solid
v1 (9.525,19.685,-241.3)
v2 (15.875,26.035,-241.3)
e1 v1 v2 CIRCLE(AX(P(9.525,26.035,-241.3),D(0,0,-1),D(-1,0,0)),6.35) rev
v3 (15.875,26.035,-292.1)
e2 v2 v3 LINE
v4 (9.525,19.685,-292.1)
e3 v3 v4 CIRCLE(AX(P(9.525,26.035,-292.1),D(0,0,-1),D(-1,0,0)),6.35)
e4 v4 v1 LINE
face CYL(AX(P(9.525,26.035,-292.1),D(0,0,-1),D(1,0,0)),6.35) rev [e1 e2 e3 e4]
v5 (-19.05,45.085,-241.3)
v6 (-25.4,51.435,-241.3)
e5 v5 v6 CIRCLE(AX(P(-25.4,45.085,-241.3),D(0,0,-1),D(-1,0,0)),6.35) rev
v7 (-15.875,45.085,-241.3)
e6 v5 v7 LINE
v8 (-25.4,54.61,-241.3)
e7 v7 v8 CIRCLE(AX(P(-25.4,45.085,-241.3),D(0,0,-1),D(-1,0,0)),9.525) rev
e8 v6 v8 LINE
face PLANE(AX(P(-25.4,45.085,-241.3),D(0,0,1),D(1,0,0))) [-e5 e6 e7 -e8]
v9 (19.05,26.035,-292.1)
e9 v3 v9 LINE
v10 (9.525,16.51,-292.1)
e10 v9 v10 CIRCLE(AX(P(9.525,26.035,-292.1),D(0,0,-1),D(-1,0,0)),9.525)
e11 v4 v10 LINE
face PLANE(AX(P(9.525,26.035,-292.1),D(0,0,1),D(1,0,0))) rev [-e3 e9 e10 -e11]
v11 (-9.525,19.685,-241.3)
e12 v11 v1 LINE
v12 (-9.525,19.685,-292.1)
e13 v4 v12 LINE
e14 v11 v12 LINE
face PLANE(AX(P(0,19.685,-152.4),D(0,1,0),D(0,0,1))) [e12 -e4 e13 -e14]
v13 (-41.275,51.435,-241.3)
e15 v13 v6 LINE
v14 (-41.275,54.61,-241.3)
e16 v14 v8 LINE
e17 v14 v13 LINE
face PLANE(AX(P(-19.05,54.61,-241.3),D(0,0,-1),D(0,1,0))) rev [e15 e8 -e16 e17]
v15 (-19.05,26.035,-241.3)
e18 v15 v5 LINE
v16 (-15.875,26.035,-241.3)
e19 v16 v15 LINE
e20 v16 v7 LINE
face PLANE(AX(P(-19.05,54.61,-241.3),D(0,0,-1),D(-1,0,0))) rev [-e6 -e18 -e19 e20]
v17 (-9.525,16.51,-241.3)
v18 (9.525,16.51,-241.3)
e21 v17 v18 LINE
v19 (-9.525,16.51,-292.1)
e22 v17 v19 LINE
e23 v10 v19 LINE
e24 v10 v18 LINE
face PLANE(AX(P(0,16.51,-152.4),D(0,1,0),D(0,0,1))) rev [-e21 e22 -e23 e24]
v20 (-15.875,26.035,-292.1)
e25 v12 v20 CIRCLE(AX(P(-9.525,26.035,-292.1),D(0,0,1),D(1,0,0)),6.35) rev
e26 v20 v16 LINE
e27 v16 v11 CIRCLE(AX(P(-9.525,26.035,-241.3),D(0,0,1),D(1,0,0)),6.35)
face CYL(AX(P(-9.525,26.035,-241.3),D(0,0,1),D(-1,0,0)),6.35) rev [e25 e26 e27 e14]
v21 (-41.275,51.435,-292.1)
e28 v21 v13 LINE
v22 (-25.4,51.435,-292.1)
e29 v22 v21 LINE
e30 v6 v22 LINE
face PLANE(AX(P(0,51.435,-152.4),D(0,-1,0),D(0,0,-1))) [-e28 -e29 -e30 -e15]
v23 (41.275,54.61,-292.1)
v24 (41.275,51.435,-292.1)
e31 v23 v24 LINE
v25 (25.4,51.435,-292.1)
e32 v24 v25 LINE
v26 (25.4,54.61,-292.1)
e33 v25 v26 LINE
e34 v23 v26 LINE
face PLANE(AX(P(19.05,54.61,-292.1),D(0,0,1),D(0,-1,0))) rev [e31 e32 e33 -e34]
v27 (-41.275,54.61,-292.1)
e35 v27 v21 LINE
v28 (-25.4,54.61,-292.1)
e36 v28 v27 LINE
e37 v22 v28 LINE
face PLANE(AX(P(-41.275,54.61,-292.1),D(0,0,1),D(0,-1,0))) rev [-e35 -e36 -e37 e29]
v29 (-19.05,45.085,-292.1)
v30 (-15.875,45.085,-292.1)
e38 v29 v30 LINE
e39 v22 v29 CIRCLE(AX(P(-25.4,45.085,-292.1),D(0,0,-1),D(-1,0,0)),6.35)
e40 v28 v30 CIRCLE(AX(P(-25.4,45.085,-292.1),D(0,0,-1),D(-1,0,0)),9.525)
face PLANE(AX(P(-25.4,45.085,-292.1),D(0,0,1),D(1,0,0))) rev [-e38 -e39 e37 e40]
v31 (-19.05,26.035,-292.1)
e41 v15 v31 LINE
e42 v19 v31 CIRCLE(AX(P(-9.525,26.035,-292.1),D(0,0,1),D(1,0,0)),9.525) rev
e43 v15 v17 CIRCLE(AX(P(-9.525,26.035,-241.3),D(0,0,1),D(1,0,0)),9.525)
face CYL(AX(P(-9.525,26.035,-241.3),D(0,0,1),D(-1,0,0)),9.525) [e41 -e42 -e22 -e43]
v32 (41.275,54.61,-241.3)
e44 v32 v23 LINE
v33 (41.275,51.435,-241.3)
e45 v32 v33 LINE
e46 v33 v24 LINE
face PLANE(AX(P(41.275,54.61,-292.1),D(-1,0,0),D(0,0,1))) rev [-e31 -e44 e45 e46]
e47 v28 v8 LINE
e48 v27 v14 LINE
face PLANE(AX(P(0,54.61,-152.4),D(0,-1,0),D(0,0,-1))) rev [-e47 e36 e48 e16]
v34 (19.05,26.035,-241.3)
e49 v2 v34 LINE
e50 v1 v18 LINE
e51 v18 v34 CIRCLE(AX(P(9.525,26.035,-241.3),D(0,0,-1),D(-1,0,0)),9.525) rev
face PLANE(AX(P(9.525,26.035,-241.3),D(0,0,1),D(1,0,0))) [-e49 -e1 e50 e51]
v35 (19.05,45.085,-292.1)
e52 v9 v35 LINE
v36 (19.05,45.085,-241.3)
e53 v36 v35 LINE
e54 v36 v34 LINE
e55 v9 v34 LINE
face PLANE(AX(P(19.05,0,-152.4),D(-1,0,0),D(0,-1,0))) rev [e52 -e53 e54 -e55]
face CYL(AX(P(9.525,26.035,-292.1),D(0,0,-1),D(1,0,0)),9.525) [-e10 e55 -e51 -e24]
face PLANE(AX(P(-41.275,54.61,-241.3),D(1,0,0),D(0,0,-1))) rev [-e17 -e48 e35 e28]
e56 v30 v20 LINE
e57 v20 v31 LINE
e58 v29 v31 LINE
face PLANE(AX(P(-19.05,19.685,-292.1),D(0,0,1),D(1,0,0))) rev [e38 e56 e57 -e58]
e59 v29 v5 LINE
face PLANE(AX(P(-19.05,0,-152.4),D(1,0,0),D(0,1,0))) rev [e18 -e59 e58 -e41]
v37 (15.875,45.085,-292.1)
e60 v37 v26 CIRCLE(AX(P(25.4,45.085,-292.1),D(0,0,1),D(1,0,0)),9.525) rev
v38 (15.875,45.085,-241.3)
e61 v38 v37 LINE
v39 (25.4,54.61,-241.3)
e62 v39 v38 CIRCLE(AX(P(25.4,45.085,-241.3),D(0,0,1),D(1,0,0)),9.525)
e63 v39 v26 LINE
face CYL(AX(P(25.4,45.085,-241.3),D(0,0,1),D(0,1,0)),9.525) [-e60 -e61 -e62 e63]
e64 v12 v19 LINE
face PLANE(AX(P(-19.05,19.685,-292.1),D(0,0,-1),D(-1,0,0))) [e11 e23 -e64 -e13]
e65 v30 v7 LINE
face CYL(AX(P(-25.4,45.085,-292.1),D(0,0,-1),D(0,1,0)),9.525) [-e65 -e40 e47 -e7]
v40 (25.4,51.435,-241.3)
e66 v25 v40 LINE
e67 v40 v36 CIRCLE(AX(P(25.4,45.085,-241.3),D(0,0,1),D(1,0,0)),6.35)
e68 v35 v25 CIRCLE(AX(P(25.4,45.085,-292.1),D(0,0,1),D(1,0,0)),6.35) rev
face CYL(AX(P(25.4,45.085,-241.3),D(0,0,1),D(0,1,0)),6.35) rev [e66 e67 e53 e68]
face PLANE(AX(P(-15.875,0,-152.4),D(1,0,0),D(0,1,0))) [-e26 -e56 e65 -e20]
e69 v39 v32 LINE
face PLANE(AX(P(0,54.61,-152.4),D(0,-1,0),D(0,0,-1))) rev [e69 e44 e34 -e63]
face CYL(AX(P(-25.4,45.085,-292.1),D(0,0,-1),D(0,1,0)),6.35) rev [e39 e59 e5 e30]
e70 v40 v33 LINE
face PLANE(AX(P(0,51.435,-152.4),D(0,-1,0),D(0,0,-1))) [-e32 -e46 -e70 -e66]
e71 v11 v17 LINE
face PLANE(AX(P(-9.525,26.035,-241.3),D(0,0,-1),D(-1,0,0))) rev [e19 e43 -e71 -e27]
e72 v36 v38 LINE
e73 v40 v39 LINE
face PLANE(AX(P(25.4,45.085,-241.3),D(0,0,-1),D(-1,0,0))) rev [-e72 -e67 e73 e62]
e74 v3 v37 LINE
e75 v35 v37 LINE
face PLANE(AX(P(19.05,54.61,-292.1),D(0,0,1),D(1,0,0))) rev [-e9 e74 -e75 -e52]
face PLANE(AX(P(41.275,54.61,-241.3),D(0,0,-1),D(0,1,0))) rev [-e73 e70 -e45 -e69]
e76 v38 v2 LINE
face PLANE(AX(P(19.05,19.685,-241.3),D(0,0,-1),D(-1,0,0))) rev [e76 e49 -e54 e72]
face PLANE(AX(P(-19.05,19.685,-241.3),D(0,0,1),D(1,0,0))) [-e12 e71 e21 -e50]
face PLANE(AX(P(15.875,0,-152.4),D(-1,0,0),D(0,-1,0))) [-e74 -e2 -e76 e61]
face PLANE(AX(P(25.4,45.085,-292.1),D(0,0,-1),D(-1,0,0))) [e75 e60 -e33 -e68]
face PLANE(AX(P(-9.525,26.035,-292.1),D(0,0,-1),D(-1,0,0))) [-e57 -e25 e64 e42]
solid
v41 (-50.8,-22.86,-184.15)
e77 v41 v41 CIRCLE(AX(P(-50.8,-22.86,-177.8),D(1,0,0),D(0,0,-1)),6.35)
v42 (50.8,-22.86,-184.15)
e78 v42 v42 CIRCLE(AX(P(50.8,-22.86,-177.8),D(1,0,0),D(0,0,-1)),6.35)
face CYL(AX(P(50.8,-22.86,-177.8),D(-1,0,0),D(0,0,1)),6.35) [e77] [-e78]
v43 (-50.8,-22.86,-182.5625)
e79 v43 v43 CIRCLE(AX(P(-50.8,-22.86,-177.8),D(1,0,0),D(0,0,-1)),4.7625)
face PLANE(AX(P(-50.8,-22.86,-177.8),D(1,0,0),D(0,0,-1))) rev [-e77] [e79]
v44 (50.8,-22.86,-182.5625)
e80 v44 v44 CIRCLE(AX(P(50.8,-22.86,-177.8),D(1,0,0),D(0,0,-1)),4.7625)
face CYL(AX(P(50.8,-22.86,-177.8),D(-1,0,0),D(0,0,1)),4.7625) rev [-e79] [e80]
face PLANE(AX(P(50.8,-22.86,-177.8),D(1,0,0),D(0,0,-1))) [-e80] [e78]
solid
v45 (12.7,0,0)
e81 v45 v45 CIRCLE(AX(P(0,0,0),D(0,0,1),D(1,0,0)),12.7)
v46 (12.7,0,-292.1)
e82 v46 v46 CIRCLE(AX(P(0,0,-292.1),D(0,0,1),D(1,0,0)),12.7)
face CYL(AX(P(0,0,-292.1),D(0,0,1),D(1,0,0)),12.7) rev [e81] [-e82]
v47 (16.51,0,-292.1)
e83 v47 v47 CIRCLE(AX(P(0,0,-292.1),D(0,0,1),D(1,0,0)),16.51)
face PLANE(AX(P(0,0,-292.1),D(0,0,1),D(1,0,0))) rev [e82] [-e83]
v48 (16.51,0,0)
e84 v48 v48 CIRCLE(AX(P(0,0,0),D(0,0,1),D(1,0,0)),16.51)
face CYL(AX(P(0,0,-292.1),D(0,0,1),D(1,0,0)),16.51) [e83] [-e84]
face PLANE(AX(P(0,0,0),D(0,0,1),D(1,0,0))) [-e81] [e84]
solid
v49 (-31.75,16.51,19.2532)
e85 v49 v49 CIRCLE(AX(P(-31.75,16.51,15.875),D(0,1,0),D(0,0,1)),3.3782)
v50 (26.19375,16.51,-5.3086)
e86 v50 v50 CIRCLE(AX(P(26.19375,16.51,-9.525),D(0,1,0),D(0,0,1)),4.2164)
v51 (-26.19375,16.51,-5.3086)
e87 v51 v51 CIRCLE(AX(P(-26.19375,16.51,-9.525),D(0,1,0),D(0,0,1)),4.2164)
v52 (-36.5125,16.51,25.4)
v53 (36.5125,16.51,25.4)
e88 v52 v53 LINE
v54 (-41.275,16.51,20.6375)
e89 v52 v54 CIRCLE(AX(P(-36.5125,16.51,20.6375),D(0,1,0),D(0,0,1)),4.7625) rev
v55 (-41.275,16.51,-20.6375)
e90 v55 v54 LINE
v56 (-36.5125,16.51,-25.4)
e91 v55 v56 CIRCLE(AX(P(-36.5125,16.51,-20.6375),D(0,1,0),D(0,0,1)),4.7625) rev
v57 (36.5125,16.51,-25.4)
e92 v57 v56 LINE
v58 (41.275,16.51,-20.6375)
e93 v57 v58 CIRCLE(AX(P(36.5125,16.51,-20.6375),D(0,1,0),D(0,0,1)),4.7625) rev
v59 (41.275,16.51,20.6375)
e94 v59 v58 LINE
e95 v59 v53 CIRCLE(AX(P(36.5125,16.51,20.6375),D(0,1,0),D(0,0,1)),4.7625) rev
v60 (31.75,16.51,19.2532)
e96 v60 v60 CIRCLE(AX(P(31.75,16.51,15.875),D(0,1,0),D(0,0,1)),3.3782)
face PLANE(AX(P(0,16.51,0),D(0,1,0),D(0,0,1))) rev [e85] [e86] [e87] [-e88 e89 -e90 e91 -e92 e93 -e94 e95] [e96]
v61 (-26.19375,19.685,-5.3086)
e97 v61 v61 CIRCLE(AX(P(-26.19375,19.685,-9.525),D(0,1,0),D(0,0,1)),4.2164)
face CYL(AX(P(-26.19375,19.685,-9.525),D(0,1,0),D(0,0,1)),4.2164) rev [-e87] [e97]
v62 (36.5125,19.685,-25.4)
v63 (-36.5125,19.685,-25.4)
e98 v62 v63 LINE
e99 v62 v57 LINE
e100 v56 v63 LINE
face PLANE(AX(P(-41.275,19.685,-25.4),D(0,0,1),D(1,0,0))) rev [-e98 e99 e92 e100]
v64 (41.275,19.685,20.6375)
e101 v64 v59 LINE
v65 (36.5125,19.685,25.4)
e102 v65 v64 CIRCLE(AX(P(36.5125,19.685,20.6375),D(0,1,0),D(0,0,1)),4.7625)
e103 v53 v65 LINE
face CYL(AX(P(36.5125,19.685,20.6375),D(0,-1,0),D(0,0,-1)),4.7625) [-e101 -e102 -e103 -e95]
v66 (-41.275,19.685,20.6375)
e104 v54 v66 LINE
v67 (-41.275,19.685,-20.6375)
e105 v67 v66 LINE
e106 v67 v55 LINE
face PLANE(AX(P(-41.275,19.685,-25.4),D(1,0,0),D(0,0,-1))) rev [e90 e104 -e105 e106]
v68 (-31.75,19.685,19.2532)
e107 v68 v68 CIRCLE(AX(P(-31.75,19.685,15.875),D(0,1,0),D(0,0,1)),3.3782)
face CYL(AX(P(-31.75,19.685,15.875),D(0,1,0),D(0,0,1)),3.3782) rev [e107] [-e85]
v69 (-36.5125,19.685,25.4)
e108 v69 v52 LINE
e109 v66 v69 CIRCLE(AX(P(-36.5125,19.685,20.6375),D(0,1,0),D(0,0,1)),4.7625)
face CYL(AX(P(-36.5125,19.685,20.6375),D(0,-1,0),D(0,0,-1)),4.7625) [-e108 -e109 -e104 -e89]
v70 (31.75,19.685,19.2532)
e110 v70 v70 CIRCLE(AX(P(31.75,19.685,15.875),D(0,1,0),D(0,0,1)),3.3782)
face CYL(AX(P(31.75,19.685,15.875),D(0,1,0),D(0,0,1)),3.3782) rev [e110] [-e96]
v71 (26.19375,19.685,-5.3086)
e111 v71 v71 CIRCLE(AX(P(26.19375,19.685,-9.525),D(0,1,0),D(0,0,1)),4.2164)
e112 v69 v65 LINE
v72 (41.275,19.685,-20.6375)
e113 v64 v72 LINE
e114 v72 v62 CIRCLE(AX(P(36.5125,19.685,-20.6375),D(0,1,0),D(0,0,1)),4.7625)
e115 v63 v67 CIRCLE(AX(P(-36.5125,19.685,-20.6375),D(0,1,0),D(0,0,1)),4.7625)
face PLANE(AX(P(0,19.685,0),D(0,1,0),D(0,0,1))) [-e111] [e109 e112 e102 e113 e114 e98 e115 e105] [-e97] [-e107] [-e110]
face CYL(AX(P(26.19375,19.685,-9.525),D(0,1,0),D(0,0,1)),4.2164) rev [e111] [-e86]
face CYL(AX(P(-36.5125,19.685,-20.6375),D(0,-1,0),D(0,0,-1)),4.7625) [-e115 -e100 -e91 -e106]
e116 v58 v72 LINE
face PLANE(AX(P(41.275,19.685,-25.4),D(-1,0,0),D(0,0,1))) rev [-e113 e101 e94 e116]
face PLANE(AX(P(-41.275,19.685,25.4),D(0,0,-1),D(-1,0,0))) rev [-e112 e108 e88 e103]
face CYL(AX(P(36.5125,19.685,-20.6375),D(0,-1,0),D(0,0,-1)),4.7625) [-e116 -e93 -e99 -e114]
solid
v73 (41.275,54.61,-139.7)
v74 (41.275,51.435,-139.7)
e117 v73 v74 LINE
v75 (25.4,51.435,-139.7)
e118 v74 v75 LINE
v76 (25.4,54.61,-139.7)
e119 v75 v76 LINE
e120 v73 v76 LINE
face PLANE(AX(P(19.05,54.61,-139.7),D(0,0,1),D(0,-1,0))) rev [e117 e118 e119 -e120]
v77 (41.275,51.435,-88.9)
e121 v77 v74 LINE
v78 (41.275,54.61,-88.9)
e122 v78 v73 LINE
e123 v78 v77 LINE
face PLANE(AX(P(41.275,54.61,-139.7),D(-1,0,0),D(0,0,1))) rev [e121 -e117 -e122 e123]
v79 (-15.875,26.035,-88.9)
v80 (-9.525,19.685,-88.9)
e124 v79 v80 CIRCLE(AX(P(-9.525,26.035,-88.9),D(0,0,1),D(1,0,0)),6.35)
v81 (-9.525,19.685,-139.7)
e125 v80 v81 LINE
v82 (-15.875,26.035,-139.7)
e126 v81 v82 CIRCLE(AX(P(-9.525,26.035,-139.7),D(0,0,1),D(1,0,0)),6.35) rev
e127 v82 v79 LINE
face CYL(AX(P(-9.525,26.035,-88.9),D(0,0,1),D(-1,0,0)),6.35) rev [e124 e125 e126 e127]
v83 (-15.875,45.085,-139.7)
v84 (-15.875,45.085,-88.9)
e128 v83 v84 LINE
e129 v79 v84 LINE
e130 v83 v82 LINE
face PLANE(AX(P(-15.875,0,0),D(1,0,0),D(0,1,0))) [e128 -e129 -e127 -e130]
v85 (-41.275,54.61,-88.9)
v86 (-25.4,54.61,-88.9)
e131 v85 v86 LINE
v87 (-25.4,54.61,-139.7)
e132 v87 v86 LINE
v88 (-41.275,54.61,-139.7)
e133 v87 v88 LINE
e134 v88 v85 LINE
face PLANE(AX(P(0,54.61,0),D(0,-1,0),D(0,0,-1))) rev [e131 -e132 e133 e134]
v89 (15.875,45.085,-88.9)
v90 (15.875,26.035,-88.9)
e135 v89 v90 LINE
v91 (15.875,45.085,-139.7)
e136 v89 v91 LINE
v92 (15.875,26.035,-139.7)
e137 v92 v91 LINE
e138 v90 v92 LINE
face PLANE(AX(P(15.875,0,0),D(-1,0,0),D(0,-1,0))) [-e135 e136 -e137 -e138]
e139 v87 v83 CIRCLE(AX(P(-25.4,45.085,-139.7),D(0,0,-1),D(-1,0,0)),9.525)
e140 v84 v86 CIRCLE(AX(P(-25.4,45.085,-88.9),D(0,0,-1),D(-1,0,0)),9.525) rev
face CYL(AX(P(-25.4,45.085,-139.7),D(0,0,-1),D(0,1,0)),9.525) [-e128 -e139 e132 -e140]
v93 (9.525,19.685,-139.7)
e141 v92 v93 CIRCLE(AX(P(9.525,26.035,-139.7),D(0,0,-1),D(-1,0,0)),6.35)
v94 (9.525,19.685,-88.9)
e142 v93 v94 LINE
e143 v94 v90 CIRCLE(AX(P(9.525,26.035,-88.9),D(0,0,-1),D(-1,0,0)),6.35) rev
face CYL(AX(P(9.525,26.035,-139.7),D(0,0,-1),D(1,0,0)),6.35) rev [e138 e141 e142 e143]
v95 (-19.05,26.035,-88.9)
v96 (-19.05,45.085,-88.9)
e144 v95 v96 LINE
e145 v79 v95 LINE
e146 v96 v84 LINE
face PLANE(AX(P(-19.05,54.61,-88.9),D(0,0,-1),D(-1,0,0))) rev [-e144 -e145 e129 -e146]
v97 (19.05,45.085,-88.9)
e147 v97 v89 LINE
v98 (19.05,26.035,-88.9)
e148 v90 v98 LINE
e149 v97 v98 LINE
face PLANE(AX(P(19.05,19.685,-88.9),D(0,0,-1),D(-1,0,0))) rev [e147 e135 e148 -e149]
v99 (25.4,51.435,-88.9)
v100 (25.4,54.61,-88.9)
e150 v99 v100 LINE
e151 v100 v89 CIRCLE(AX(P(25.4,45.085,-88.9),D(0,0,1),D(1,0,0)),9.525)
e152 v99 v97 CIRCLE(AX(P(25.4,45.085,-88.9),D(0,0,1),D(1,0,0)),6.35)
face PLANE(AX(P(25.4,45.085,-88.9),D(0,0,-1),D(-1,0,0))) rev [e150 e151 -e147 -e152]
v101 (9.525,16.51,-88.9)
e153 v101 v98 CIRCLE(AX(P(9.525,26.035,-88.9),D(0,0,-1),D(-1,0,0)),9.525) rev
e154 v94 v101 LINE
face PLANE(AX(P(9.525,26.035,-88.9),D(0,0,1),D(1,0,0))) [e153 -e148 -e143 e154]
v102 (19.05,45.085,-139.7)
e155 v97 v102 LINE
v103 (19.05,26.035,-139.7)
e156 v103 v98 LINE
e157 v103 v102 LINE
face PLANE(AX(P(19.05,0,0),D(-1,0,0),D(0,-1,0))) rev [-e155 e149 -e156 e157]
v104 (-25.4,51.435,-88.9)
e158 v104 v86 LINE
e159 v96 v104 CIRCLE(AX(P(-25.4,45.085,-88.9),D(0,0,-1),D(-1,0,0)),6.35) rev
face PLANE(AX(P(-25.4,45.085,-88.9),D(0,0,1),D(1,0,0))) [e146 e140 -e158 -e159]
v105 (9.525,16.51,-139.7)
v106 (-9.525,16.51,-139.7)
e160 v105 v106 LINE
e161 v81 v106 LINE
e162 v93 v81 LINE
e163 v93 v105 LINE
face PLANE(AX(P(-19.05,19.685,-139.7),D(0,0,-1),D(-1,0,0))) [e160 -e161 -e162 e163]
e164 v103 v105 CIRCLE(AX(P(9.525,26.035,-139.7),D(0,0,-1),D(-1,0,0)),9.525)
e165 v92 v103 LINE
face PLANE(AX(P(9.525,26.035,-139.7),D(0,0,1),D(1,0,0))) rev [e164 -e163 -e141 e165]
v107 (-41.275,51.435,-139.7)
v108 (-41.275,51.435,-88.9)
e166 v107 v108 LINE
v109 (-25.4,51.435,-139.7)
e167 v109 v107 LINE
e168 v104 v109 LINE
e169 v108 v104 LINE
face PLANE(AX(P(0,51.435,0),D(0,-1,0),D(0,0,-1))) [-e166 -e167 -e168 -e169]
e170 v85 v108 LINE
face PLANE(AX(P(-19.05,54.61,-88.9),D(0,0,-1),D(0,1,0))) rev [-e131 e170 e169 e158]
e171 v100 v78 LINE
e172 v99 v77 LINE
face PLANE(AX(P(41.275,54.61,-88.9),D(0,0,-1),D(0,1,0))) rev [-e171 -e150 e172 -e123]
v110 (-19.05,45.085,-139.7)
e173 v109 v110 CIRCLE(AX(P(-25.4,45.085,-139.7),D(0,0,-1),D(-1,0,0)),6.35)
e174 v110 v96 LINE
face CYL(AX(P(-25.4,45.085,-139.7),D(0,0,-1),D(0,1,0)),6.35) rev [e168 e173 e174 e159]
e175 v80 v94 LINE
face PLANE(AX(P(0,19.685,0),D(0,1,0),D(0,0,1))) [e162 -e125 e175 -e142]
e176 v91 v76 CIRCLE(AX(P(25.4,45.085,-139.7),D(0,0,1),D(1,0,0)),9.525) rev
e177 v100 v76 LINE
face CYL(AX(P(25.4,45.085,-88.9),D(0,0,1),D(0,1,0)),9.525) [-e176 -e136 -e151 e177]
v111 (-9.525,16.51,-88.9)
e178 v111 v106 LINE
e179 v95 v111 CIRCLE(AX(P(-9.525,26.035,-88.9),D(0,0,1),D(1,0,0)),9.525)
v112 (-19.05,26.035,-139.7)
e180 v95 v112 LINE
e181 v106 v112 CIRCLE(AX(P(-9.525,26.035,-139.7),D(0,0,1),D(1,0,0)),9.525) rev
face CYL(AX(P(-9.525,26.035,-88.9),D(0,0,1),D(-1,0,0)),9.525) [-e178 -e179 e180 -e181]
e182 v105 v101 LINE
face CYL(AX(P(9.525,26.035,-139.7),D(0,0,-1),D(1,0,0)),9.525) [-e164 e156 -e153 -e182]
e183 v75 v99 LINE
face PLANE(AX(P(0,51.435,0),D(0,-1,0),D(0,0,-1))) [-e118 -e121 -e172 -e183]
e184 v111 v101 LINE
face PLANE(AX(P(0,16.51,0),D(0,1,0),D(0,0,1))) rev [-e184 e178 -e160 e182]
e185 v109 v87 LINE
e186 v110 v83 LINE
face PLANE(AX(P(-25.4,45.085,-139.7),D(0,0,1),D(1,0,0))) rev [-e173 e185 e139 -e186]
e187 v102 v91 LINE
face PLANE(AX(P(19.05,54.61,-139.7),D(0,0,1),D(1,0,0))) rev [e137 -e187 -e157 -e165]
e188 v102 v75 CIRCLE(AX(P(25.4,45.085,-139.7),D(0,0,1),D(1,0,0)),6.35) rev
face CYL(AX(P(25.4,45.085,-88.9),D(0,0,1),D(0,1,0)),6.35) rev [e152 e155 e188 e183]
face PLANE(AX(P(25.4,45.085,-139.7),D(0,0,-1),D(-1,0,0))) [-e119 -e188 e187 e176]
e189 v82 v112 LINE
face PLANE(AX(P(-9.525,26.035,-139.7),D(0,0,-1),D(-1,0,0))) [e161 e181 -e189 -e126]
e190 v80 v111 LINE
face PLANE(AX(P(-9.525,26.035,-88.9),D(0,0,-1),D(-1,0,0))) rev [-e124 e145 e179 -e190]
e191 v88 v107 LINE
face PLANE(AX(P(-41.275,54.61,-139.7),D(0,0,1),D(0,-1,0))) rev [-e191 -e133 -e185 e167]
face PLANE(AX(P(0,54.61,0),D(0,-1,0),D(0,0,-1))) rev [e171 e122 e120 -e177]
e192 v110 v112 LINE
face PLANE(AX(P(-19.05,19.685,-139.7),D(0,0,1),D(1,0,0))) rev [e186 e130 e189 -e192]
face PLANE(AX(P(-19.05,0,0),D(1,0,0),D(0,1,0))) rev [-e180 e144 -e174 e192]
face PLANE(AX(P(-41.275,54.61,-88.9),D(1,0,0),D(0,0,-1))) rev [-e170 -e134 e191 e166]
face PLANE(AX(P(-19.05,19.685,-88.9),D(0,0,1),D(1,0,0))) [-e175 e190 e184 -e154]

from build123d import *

# Parameters (mm, degrees)
SKETCH1_R                         = 16.51
SKETCH1_R_2                       = 12.7
BOSS_EXTRUDE1_DEPTH               = 292.1
BOSS_EXTRUDE2_START               = 16.51
SKETCH2_W                         = 82.55
SKETCH2_H                         = 50.8
BOSS_EXTRUDE2_DEPTH               = 3.175
SKETCH2_W_2                       = 38.1
BOSS_EXTRUDE2_2_DEPTH             = 3.175
FILLET1_R                         = 4.7625
SKETCH4_W                         = 3.3782
SKETCH4_H                         = 36.195
F_1_4_CLEARANCE_HOLE1_AT_2_COUNT  = 2
F_1_4_CLEARANCE_HOLE1_AT_2_PITCH  = 63.5
SKETCH18_W                        = 4.2164
SKETCH18_H                        = 36.195
F_5_16_CLEARANCE_HOLE1_AT_2_COUNT = 2
F_5_16_CLEARANCE_HOLE1_AT_2_PITCH = 52.3875
SKETCH16_R                        = 6.35
SKETCH16_R_2                      = 4.7625
BOSS_EXTRUDE3_DEPTH               = 50.8
EDGE_FLANGE1_STRIP_W              = 25.4
EDGE_FLANGE1_STRIP_H              = 3.175
EDGE_FLANGE1_STRIP_CUT_DEPTH      = 50.8
EDGE_FLANGE1_STRIP_2_W            = 25.4
EDGE_FLANGE1_STRIP_2_H            = 3.175
EDGE_FLANGE1_STRIP_CUT_2_DEPTH    = 50.8
EDGE_FLANGE1_DEPTH                = 50.8
EDGE_FLANGE1_BEND_DEPTH           = 50.8
EDGE_FLANGE3_STRIP_W              = 25.4
EDGE_FLANGE3_STRIP_H              = 3.175
EDGE_FLANGE3_STRIP_CUT_DEPTH      = 50.8
EDGE_FLANGE3_STRIP_2_W            = 25.4
EDGE_FLANGE3_STRIP_2_H            = 3.175
EDGE_FLANGE3_STRIP_CUT_2_DEPTH    = 50.8
EDGE_FLANGE3_DEPTH                = 50.8
EDGE_FLANGE3_BEND_DEPTH           = 50.8
LPATTERN1_COUNT                   = 2
LPATTERN1_PITCH                   = 152.4


# Sheet-metal steps are written as plain solids
with BuildPart() as part:
    # Sketch1 → Boss-Extrude1 (new body)
    with BuildSketch(Plane.XY):
        Circle(SKETCH1_R)
        Circle(SKETCH1_R_2, mode=Mode.SUBTRACT)
    extrude(amount=-BOSS_EXTRUDE1_DEPTH)


with BuildPart() as body_2:
    # Sketch2 → Boss-Extrude2 (new body)
    with BuildSketch(Plane(origin=(0, 0, 0), x_dir=(1, 0, 0), z_dir=(0, 1, 0)).offset(BOSS_EXTRUDE2_START)):
        Rectangle(SKETCH2_W, SKETCH2_H)
    extrude(amount=BOSS_EXTRUDE2_DEPTH)

    # Fillet1
    fillet1_edges = [body_2.edges().sort_by_distance(p)[0] for p in [
        (-41.275, 18.0975, -25.4),
        (41.275, 18.0975, -25.4),
        (41.275, 18.0975, 25.4),
        (-41.275, 18.0975, 25.4),
    ]]
    fillet(fillet1_edges, radius=FILLET1_R)

    # Sketch4 → 1/4 Clearance Hole1 (revolve, cut)
    with BuildSketch(Plane(origin=(-31.75, 19.685, 15.875), x_dir=(0, 0, 1), z_dir=(1, 0, 0))):
        with Locations((1.6891, 18.0975)):
            Rectangle(SKETCH4_W, SKETCH4_H)
    f_1_4_clearance_hole1 = revolve(axis=Axis((-31.75, 26.035, 15.875), (0, -1, 0)), mode=Mode.SUBTRACT)

    # 1/4 Clearance Hole1 at 2: 1/4 Clearance Hole1 ×2
    with Locations(*[(i * F_1_4_CLEARANCE_HOLE1_AT_2_PITCH, 0, 0) for i in range(1, F_1_4_CLEARANCE_HOLE1_AT_2_COUNT)]):
        add(f_1_4_clearance_hole1, mode=Mode.SUBTRACT)

    # Sketch18 → 5/16 Clearance Hole1 (revolve, cut)
    with BuildSketch(Plane(origin=(-26.19375, 19.685, -9.525), x_dir=(0, 0, 1), z_dir=(1, 0, 0))):
        with Locations((2.1082, 18.0975)):
            Rectangle(SKETCH18_W, SKETCH18_H)
    f_5_16_clearance_hole1 = revolve(axis=Axis((-26.19375, 26.035, -9.525), (0, -1, 0)), mode=Mode.SUBTRACT)

    # 5/16 Clearance Hole1 at 2: 5/16 Clearance Hole1 ×2
    with Locations(*[(i * F_5_16_CLEARANCE_HOLE1_AT_2_PITCH, 0, 0) for i in range(1, F_5_16_CLEARANCE_HOLE1_AT_2_COUNT)]):
        add(f_5_16_clearance_hole1, mode=Mode.SUBTRACT)


with BuildPart() as body_3:
    # Sketch2 → Boss-Extrude2 2 (new body)
    with BuildSketch(Plane(origin=(0, 0, 0), x_dir=(1, 0, 0), z_dir=(0, 1, 0)).offset(BOSS_EXTRUDE2_START)):
        with Locations((0, 114.3)):
            Rectangle(SKETCH2_W_2, SKETCH2_H)
    extrude(amount=BOSS_EXTRUDE2_2_DEPTH)

    # Edge-Flange1 strip (across the edge) → Edge-Flange1 strip cut (cut)
    with BuildSketch(Plane(origin=(19.05, 19.685, -88.9), x_dir=(-1, 0, 0), z_dir=(0, 0, -1))):
        with Locations((-3.175, -1.5875)):
            Rectangle(EDGE_FLANGE1_STRIP_W, EDGE_FLANGE1_STRIP_H)
    extrude(amount=EDGE_FLANGE1_STRIP_CUT_DEPTH, mode=Mode.SUBTRACT)

    # Edge-Flange1 strip 2 (across the edge) → Edge-Flange1 strip cut 2 (cut)
    with BuildSketch(Plane(origin=(-19.05, 19.685, -139.7), x_dir=(1, 0, 0), z_dir=(0, 0, 1))):
        with Locations((-3.175, -1.5875)):
            Rectangle(EDGE_FLANGE1_STRIP_2_W, EDGE_FLANGE1_STRIP_2_H)
    extrude(amount=EDGE_FLANGE1_STRIP_CUT_2_DEPTH, mode=Mode.SUBTRACT)

    # Edge-Flange1 section (across the edge) → Edge-Flange1 (add)
    with BuildSketch(Plane(origin=(19.05, 19.685, -88.9), x_dir=(-1, 0, 0), z_dir=(0, 0, -1))):
        with BuildLine():
            Line((0, 6.35), (0, 34.925))
            Line((0, 34.925), (3.175, 34.925))
            Line((3.175, 34.925), (3.175, 6.35))
            ThreePointArc((3.175, 6.35), (5.034871939, 1.859871939), (9.525, 0))
            Line((9.525, 0), (9.525, -3.175))
            ThreePointArc((9.525, -3.175), (2.789807909, -0.385192091), (0, 6.35))
        make_face()
    extrude(amount=EDGE_FLANGE1_DEPTH)

    # Edge-Flange1 section 2 (across the edge) → Edge-Flange1 bend (add)
    with BuildSketch(Plane(origin=(-19.05, 19.685, -139.7), x_dir=(1, 0, 0), z_dir=(0, 0, 1))):
        with BuildLine():
            Line((0, 6.35), (0, 34.925))
            Line((0, 34.925), (3.175, 34.925))
            Line((3.175, 34.925), (3.175, 6.35))
            ThreePointArc((3.175, 6.35), (5.034871939, 1.859871939), (9.525, 0))
            Line((9.525, 0), (9.525, -3.175))
            ThreePointArc((9.525, -3.175), (2.789807909, -0.385192091), (0, 6.35))
        make_face()
    extrude(amount=EDGE_FLANGE1_BEND_DEPTH)

    # Edge-Flange3 strip (across the edge) → Edge-Flange3 strip cut (cut)
    with BuildSketch(Plane(origin=(-19.05, 54.61, -88.9), x_dir=(0, -1, 0), z_dir=(0, 0, -1))):
        with Locations((-3.175, -1.5875)):
            Rectangle(EDGE_FLANGE3_STRIP_W, EDGE_FLANGE3_STRIP_H)
    extrude(amount=EDGE_FLANGE3_STRIP_CUT_DEPTH, mode=Mode.SUBTRACT)

    # Edge-Flange3 strip 2 (across the edge) → Edge-Flange3 strip cut 2 (cut)
    with BuildSketch(Plane(origin=(19.05, 54.61, -139.7), x_dir=(0, -1, 0), z_dir=(0, 0, 1))):
        with Locations((-3.175, -1.5875)):
            Rectangle(EDGE_FLANGE3_STRIP_2_W, EDGE_FLANGE3_STRIP_2_H)
    extrude(amount=EDGE_FLANGE3_STRIP_CUT_2_DEPTH, mode=Mode.SUBTRACT)

    # Edge-Flange3 section (across the edge) → Edge-Flange3 (add)
    with BuildSketch(Plane(origin=(-19.05, 54.61, -88.9), x_dir=(0, -1, 0), z_dir=(0, 0, -1))):
        with BuildLine():
            Line((0, 6.35), (0, 22.225))
            Line((0, 22.225), (3.175, 22.225))
            Line((3.175, 22.225), (3.175, 6.35))
            ThreePointArc((3.175, 6.35), (5.034871939, 1.859871939), (9.525, 0))
            Line((9.525, 0), (9.525, -3.175))
            ThreePointArc((9.525, -3.175), (2.789807909, -0.385192091), (0, 6.35))
        make_face()
    extrude(amount=EDGE_FLANGE3_DEPTH)

    # Edge-Flange3 section 2 (across the edge) → Edge-Flange3 bend (add)
    with BuildSketch(Plane(origin=(19.05, 54.61, -139.7), x_dir=(0, -1, 0), z_dir=(0, 0, 1))):
        with BuildLine():
            Line((0, 6.35), (0, 22.225))
            Line((0, 22.225), (3.175, 22.225))
            Line((3.175, 22.225), (3.175, 6.35))
            ThreePointArc((3.175, 6.35), (5.034871939, 1.859871939), (9.525, 0))
            Line((9.525, 0), (9.525, -3.175))
            ThreePointArc((9.525, -3.175), (2.789807909, -0.385192091), (0, 6.35))
        make_face()
    extrude(amount=EDGE_FLANGE3_BEND_DEPTH)


with BuildPart() as body_4:
    # Sketch16 → Boss-Extrude3 (new, symmetric)
    with BuildSketch(Plane(origin=(0, 0, 0), x_dir=(0, 0, -1), z_dir=(1, 0, 0))):
        with Locations((177.8, -22.86)):
            Circle(SKETCH16_R)
        with Locations((177.8, -22.86)):
            Circle(SKETCH16_R_2, mode=Mode.SUBTRACT)
    extrude(amount=BOSS_EXTRUDE3_DEPTH, both=True)


with BuildPart() as lpattern1_1:
    # LPattern1: pattern copy
    add(body_3.part.moved(Location(Vector(0, 0, -1) * (1 * LPATTERN1_PITCH))))


solid = Compound([part.part, body_2.part, body_3.part, body_4.part, lpattern1_1.part])
